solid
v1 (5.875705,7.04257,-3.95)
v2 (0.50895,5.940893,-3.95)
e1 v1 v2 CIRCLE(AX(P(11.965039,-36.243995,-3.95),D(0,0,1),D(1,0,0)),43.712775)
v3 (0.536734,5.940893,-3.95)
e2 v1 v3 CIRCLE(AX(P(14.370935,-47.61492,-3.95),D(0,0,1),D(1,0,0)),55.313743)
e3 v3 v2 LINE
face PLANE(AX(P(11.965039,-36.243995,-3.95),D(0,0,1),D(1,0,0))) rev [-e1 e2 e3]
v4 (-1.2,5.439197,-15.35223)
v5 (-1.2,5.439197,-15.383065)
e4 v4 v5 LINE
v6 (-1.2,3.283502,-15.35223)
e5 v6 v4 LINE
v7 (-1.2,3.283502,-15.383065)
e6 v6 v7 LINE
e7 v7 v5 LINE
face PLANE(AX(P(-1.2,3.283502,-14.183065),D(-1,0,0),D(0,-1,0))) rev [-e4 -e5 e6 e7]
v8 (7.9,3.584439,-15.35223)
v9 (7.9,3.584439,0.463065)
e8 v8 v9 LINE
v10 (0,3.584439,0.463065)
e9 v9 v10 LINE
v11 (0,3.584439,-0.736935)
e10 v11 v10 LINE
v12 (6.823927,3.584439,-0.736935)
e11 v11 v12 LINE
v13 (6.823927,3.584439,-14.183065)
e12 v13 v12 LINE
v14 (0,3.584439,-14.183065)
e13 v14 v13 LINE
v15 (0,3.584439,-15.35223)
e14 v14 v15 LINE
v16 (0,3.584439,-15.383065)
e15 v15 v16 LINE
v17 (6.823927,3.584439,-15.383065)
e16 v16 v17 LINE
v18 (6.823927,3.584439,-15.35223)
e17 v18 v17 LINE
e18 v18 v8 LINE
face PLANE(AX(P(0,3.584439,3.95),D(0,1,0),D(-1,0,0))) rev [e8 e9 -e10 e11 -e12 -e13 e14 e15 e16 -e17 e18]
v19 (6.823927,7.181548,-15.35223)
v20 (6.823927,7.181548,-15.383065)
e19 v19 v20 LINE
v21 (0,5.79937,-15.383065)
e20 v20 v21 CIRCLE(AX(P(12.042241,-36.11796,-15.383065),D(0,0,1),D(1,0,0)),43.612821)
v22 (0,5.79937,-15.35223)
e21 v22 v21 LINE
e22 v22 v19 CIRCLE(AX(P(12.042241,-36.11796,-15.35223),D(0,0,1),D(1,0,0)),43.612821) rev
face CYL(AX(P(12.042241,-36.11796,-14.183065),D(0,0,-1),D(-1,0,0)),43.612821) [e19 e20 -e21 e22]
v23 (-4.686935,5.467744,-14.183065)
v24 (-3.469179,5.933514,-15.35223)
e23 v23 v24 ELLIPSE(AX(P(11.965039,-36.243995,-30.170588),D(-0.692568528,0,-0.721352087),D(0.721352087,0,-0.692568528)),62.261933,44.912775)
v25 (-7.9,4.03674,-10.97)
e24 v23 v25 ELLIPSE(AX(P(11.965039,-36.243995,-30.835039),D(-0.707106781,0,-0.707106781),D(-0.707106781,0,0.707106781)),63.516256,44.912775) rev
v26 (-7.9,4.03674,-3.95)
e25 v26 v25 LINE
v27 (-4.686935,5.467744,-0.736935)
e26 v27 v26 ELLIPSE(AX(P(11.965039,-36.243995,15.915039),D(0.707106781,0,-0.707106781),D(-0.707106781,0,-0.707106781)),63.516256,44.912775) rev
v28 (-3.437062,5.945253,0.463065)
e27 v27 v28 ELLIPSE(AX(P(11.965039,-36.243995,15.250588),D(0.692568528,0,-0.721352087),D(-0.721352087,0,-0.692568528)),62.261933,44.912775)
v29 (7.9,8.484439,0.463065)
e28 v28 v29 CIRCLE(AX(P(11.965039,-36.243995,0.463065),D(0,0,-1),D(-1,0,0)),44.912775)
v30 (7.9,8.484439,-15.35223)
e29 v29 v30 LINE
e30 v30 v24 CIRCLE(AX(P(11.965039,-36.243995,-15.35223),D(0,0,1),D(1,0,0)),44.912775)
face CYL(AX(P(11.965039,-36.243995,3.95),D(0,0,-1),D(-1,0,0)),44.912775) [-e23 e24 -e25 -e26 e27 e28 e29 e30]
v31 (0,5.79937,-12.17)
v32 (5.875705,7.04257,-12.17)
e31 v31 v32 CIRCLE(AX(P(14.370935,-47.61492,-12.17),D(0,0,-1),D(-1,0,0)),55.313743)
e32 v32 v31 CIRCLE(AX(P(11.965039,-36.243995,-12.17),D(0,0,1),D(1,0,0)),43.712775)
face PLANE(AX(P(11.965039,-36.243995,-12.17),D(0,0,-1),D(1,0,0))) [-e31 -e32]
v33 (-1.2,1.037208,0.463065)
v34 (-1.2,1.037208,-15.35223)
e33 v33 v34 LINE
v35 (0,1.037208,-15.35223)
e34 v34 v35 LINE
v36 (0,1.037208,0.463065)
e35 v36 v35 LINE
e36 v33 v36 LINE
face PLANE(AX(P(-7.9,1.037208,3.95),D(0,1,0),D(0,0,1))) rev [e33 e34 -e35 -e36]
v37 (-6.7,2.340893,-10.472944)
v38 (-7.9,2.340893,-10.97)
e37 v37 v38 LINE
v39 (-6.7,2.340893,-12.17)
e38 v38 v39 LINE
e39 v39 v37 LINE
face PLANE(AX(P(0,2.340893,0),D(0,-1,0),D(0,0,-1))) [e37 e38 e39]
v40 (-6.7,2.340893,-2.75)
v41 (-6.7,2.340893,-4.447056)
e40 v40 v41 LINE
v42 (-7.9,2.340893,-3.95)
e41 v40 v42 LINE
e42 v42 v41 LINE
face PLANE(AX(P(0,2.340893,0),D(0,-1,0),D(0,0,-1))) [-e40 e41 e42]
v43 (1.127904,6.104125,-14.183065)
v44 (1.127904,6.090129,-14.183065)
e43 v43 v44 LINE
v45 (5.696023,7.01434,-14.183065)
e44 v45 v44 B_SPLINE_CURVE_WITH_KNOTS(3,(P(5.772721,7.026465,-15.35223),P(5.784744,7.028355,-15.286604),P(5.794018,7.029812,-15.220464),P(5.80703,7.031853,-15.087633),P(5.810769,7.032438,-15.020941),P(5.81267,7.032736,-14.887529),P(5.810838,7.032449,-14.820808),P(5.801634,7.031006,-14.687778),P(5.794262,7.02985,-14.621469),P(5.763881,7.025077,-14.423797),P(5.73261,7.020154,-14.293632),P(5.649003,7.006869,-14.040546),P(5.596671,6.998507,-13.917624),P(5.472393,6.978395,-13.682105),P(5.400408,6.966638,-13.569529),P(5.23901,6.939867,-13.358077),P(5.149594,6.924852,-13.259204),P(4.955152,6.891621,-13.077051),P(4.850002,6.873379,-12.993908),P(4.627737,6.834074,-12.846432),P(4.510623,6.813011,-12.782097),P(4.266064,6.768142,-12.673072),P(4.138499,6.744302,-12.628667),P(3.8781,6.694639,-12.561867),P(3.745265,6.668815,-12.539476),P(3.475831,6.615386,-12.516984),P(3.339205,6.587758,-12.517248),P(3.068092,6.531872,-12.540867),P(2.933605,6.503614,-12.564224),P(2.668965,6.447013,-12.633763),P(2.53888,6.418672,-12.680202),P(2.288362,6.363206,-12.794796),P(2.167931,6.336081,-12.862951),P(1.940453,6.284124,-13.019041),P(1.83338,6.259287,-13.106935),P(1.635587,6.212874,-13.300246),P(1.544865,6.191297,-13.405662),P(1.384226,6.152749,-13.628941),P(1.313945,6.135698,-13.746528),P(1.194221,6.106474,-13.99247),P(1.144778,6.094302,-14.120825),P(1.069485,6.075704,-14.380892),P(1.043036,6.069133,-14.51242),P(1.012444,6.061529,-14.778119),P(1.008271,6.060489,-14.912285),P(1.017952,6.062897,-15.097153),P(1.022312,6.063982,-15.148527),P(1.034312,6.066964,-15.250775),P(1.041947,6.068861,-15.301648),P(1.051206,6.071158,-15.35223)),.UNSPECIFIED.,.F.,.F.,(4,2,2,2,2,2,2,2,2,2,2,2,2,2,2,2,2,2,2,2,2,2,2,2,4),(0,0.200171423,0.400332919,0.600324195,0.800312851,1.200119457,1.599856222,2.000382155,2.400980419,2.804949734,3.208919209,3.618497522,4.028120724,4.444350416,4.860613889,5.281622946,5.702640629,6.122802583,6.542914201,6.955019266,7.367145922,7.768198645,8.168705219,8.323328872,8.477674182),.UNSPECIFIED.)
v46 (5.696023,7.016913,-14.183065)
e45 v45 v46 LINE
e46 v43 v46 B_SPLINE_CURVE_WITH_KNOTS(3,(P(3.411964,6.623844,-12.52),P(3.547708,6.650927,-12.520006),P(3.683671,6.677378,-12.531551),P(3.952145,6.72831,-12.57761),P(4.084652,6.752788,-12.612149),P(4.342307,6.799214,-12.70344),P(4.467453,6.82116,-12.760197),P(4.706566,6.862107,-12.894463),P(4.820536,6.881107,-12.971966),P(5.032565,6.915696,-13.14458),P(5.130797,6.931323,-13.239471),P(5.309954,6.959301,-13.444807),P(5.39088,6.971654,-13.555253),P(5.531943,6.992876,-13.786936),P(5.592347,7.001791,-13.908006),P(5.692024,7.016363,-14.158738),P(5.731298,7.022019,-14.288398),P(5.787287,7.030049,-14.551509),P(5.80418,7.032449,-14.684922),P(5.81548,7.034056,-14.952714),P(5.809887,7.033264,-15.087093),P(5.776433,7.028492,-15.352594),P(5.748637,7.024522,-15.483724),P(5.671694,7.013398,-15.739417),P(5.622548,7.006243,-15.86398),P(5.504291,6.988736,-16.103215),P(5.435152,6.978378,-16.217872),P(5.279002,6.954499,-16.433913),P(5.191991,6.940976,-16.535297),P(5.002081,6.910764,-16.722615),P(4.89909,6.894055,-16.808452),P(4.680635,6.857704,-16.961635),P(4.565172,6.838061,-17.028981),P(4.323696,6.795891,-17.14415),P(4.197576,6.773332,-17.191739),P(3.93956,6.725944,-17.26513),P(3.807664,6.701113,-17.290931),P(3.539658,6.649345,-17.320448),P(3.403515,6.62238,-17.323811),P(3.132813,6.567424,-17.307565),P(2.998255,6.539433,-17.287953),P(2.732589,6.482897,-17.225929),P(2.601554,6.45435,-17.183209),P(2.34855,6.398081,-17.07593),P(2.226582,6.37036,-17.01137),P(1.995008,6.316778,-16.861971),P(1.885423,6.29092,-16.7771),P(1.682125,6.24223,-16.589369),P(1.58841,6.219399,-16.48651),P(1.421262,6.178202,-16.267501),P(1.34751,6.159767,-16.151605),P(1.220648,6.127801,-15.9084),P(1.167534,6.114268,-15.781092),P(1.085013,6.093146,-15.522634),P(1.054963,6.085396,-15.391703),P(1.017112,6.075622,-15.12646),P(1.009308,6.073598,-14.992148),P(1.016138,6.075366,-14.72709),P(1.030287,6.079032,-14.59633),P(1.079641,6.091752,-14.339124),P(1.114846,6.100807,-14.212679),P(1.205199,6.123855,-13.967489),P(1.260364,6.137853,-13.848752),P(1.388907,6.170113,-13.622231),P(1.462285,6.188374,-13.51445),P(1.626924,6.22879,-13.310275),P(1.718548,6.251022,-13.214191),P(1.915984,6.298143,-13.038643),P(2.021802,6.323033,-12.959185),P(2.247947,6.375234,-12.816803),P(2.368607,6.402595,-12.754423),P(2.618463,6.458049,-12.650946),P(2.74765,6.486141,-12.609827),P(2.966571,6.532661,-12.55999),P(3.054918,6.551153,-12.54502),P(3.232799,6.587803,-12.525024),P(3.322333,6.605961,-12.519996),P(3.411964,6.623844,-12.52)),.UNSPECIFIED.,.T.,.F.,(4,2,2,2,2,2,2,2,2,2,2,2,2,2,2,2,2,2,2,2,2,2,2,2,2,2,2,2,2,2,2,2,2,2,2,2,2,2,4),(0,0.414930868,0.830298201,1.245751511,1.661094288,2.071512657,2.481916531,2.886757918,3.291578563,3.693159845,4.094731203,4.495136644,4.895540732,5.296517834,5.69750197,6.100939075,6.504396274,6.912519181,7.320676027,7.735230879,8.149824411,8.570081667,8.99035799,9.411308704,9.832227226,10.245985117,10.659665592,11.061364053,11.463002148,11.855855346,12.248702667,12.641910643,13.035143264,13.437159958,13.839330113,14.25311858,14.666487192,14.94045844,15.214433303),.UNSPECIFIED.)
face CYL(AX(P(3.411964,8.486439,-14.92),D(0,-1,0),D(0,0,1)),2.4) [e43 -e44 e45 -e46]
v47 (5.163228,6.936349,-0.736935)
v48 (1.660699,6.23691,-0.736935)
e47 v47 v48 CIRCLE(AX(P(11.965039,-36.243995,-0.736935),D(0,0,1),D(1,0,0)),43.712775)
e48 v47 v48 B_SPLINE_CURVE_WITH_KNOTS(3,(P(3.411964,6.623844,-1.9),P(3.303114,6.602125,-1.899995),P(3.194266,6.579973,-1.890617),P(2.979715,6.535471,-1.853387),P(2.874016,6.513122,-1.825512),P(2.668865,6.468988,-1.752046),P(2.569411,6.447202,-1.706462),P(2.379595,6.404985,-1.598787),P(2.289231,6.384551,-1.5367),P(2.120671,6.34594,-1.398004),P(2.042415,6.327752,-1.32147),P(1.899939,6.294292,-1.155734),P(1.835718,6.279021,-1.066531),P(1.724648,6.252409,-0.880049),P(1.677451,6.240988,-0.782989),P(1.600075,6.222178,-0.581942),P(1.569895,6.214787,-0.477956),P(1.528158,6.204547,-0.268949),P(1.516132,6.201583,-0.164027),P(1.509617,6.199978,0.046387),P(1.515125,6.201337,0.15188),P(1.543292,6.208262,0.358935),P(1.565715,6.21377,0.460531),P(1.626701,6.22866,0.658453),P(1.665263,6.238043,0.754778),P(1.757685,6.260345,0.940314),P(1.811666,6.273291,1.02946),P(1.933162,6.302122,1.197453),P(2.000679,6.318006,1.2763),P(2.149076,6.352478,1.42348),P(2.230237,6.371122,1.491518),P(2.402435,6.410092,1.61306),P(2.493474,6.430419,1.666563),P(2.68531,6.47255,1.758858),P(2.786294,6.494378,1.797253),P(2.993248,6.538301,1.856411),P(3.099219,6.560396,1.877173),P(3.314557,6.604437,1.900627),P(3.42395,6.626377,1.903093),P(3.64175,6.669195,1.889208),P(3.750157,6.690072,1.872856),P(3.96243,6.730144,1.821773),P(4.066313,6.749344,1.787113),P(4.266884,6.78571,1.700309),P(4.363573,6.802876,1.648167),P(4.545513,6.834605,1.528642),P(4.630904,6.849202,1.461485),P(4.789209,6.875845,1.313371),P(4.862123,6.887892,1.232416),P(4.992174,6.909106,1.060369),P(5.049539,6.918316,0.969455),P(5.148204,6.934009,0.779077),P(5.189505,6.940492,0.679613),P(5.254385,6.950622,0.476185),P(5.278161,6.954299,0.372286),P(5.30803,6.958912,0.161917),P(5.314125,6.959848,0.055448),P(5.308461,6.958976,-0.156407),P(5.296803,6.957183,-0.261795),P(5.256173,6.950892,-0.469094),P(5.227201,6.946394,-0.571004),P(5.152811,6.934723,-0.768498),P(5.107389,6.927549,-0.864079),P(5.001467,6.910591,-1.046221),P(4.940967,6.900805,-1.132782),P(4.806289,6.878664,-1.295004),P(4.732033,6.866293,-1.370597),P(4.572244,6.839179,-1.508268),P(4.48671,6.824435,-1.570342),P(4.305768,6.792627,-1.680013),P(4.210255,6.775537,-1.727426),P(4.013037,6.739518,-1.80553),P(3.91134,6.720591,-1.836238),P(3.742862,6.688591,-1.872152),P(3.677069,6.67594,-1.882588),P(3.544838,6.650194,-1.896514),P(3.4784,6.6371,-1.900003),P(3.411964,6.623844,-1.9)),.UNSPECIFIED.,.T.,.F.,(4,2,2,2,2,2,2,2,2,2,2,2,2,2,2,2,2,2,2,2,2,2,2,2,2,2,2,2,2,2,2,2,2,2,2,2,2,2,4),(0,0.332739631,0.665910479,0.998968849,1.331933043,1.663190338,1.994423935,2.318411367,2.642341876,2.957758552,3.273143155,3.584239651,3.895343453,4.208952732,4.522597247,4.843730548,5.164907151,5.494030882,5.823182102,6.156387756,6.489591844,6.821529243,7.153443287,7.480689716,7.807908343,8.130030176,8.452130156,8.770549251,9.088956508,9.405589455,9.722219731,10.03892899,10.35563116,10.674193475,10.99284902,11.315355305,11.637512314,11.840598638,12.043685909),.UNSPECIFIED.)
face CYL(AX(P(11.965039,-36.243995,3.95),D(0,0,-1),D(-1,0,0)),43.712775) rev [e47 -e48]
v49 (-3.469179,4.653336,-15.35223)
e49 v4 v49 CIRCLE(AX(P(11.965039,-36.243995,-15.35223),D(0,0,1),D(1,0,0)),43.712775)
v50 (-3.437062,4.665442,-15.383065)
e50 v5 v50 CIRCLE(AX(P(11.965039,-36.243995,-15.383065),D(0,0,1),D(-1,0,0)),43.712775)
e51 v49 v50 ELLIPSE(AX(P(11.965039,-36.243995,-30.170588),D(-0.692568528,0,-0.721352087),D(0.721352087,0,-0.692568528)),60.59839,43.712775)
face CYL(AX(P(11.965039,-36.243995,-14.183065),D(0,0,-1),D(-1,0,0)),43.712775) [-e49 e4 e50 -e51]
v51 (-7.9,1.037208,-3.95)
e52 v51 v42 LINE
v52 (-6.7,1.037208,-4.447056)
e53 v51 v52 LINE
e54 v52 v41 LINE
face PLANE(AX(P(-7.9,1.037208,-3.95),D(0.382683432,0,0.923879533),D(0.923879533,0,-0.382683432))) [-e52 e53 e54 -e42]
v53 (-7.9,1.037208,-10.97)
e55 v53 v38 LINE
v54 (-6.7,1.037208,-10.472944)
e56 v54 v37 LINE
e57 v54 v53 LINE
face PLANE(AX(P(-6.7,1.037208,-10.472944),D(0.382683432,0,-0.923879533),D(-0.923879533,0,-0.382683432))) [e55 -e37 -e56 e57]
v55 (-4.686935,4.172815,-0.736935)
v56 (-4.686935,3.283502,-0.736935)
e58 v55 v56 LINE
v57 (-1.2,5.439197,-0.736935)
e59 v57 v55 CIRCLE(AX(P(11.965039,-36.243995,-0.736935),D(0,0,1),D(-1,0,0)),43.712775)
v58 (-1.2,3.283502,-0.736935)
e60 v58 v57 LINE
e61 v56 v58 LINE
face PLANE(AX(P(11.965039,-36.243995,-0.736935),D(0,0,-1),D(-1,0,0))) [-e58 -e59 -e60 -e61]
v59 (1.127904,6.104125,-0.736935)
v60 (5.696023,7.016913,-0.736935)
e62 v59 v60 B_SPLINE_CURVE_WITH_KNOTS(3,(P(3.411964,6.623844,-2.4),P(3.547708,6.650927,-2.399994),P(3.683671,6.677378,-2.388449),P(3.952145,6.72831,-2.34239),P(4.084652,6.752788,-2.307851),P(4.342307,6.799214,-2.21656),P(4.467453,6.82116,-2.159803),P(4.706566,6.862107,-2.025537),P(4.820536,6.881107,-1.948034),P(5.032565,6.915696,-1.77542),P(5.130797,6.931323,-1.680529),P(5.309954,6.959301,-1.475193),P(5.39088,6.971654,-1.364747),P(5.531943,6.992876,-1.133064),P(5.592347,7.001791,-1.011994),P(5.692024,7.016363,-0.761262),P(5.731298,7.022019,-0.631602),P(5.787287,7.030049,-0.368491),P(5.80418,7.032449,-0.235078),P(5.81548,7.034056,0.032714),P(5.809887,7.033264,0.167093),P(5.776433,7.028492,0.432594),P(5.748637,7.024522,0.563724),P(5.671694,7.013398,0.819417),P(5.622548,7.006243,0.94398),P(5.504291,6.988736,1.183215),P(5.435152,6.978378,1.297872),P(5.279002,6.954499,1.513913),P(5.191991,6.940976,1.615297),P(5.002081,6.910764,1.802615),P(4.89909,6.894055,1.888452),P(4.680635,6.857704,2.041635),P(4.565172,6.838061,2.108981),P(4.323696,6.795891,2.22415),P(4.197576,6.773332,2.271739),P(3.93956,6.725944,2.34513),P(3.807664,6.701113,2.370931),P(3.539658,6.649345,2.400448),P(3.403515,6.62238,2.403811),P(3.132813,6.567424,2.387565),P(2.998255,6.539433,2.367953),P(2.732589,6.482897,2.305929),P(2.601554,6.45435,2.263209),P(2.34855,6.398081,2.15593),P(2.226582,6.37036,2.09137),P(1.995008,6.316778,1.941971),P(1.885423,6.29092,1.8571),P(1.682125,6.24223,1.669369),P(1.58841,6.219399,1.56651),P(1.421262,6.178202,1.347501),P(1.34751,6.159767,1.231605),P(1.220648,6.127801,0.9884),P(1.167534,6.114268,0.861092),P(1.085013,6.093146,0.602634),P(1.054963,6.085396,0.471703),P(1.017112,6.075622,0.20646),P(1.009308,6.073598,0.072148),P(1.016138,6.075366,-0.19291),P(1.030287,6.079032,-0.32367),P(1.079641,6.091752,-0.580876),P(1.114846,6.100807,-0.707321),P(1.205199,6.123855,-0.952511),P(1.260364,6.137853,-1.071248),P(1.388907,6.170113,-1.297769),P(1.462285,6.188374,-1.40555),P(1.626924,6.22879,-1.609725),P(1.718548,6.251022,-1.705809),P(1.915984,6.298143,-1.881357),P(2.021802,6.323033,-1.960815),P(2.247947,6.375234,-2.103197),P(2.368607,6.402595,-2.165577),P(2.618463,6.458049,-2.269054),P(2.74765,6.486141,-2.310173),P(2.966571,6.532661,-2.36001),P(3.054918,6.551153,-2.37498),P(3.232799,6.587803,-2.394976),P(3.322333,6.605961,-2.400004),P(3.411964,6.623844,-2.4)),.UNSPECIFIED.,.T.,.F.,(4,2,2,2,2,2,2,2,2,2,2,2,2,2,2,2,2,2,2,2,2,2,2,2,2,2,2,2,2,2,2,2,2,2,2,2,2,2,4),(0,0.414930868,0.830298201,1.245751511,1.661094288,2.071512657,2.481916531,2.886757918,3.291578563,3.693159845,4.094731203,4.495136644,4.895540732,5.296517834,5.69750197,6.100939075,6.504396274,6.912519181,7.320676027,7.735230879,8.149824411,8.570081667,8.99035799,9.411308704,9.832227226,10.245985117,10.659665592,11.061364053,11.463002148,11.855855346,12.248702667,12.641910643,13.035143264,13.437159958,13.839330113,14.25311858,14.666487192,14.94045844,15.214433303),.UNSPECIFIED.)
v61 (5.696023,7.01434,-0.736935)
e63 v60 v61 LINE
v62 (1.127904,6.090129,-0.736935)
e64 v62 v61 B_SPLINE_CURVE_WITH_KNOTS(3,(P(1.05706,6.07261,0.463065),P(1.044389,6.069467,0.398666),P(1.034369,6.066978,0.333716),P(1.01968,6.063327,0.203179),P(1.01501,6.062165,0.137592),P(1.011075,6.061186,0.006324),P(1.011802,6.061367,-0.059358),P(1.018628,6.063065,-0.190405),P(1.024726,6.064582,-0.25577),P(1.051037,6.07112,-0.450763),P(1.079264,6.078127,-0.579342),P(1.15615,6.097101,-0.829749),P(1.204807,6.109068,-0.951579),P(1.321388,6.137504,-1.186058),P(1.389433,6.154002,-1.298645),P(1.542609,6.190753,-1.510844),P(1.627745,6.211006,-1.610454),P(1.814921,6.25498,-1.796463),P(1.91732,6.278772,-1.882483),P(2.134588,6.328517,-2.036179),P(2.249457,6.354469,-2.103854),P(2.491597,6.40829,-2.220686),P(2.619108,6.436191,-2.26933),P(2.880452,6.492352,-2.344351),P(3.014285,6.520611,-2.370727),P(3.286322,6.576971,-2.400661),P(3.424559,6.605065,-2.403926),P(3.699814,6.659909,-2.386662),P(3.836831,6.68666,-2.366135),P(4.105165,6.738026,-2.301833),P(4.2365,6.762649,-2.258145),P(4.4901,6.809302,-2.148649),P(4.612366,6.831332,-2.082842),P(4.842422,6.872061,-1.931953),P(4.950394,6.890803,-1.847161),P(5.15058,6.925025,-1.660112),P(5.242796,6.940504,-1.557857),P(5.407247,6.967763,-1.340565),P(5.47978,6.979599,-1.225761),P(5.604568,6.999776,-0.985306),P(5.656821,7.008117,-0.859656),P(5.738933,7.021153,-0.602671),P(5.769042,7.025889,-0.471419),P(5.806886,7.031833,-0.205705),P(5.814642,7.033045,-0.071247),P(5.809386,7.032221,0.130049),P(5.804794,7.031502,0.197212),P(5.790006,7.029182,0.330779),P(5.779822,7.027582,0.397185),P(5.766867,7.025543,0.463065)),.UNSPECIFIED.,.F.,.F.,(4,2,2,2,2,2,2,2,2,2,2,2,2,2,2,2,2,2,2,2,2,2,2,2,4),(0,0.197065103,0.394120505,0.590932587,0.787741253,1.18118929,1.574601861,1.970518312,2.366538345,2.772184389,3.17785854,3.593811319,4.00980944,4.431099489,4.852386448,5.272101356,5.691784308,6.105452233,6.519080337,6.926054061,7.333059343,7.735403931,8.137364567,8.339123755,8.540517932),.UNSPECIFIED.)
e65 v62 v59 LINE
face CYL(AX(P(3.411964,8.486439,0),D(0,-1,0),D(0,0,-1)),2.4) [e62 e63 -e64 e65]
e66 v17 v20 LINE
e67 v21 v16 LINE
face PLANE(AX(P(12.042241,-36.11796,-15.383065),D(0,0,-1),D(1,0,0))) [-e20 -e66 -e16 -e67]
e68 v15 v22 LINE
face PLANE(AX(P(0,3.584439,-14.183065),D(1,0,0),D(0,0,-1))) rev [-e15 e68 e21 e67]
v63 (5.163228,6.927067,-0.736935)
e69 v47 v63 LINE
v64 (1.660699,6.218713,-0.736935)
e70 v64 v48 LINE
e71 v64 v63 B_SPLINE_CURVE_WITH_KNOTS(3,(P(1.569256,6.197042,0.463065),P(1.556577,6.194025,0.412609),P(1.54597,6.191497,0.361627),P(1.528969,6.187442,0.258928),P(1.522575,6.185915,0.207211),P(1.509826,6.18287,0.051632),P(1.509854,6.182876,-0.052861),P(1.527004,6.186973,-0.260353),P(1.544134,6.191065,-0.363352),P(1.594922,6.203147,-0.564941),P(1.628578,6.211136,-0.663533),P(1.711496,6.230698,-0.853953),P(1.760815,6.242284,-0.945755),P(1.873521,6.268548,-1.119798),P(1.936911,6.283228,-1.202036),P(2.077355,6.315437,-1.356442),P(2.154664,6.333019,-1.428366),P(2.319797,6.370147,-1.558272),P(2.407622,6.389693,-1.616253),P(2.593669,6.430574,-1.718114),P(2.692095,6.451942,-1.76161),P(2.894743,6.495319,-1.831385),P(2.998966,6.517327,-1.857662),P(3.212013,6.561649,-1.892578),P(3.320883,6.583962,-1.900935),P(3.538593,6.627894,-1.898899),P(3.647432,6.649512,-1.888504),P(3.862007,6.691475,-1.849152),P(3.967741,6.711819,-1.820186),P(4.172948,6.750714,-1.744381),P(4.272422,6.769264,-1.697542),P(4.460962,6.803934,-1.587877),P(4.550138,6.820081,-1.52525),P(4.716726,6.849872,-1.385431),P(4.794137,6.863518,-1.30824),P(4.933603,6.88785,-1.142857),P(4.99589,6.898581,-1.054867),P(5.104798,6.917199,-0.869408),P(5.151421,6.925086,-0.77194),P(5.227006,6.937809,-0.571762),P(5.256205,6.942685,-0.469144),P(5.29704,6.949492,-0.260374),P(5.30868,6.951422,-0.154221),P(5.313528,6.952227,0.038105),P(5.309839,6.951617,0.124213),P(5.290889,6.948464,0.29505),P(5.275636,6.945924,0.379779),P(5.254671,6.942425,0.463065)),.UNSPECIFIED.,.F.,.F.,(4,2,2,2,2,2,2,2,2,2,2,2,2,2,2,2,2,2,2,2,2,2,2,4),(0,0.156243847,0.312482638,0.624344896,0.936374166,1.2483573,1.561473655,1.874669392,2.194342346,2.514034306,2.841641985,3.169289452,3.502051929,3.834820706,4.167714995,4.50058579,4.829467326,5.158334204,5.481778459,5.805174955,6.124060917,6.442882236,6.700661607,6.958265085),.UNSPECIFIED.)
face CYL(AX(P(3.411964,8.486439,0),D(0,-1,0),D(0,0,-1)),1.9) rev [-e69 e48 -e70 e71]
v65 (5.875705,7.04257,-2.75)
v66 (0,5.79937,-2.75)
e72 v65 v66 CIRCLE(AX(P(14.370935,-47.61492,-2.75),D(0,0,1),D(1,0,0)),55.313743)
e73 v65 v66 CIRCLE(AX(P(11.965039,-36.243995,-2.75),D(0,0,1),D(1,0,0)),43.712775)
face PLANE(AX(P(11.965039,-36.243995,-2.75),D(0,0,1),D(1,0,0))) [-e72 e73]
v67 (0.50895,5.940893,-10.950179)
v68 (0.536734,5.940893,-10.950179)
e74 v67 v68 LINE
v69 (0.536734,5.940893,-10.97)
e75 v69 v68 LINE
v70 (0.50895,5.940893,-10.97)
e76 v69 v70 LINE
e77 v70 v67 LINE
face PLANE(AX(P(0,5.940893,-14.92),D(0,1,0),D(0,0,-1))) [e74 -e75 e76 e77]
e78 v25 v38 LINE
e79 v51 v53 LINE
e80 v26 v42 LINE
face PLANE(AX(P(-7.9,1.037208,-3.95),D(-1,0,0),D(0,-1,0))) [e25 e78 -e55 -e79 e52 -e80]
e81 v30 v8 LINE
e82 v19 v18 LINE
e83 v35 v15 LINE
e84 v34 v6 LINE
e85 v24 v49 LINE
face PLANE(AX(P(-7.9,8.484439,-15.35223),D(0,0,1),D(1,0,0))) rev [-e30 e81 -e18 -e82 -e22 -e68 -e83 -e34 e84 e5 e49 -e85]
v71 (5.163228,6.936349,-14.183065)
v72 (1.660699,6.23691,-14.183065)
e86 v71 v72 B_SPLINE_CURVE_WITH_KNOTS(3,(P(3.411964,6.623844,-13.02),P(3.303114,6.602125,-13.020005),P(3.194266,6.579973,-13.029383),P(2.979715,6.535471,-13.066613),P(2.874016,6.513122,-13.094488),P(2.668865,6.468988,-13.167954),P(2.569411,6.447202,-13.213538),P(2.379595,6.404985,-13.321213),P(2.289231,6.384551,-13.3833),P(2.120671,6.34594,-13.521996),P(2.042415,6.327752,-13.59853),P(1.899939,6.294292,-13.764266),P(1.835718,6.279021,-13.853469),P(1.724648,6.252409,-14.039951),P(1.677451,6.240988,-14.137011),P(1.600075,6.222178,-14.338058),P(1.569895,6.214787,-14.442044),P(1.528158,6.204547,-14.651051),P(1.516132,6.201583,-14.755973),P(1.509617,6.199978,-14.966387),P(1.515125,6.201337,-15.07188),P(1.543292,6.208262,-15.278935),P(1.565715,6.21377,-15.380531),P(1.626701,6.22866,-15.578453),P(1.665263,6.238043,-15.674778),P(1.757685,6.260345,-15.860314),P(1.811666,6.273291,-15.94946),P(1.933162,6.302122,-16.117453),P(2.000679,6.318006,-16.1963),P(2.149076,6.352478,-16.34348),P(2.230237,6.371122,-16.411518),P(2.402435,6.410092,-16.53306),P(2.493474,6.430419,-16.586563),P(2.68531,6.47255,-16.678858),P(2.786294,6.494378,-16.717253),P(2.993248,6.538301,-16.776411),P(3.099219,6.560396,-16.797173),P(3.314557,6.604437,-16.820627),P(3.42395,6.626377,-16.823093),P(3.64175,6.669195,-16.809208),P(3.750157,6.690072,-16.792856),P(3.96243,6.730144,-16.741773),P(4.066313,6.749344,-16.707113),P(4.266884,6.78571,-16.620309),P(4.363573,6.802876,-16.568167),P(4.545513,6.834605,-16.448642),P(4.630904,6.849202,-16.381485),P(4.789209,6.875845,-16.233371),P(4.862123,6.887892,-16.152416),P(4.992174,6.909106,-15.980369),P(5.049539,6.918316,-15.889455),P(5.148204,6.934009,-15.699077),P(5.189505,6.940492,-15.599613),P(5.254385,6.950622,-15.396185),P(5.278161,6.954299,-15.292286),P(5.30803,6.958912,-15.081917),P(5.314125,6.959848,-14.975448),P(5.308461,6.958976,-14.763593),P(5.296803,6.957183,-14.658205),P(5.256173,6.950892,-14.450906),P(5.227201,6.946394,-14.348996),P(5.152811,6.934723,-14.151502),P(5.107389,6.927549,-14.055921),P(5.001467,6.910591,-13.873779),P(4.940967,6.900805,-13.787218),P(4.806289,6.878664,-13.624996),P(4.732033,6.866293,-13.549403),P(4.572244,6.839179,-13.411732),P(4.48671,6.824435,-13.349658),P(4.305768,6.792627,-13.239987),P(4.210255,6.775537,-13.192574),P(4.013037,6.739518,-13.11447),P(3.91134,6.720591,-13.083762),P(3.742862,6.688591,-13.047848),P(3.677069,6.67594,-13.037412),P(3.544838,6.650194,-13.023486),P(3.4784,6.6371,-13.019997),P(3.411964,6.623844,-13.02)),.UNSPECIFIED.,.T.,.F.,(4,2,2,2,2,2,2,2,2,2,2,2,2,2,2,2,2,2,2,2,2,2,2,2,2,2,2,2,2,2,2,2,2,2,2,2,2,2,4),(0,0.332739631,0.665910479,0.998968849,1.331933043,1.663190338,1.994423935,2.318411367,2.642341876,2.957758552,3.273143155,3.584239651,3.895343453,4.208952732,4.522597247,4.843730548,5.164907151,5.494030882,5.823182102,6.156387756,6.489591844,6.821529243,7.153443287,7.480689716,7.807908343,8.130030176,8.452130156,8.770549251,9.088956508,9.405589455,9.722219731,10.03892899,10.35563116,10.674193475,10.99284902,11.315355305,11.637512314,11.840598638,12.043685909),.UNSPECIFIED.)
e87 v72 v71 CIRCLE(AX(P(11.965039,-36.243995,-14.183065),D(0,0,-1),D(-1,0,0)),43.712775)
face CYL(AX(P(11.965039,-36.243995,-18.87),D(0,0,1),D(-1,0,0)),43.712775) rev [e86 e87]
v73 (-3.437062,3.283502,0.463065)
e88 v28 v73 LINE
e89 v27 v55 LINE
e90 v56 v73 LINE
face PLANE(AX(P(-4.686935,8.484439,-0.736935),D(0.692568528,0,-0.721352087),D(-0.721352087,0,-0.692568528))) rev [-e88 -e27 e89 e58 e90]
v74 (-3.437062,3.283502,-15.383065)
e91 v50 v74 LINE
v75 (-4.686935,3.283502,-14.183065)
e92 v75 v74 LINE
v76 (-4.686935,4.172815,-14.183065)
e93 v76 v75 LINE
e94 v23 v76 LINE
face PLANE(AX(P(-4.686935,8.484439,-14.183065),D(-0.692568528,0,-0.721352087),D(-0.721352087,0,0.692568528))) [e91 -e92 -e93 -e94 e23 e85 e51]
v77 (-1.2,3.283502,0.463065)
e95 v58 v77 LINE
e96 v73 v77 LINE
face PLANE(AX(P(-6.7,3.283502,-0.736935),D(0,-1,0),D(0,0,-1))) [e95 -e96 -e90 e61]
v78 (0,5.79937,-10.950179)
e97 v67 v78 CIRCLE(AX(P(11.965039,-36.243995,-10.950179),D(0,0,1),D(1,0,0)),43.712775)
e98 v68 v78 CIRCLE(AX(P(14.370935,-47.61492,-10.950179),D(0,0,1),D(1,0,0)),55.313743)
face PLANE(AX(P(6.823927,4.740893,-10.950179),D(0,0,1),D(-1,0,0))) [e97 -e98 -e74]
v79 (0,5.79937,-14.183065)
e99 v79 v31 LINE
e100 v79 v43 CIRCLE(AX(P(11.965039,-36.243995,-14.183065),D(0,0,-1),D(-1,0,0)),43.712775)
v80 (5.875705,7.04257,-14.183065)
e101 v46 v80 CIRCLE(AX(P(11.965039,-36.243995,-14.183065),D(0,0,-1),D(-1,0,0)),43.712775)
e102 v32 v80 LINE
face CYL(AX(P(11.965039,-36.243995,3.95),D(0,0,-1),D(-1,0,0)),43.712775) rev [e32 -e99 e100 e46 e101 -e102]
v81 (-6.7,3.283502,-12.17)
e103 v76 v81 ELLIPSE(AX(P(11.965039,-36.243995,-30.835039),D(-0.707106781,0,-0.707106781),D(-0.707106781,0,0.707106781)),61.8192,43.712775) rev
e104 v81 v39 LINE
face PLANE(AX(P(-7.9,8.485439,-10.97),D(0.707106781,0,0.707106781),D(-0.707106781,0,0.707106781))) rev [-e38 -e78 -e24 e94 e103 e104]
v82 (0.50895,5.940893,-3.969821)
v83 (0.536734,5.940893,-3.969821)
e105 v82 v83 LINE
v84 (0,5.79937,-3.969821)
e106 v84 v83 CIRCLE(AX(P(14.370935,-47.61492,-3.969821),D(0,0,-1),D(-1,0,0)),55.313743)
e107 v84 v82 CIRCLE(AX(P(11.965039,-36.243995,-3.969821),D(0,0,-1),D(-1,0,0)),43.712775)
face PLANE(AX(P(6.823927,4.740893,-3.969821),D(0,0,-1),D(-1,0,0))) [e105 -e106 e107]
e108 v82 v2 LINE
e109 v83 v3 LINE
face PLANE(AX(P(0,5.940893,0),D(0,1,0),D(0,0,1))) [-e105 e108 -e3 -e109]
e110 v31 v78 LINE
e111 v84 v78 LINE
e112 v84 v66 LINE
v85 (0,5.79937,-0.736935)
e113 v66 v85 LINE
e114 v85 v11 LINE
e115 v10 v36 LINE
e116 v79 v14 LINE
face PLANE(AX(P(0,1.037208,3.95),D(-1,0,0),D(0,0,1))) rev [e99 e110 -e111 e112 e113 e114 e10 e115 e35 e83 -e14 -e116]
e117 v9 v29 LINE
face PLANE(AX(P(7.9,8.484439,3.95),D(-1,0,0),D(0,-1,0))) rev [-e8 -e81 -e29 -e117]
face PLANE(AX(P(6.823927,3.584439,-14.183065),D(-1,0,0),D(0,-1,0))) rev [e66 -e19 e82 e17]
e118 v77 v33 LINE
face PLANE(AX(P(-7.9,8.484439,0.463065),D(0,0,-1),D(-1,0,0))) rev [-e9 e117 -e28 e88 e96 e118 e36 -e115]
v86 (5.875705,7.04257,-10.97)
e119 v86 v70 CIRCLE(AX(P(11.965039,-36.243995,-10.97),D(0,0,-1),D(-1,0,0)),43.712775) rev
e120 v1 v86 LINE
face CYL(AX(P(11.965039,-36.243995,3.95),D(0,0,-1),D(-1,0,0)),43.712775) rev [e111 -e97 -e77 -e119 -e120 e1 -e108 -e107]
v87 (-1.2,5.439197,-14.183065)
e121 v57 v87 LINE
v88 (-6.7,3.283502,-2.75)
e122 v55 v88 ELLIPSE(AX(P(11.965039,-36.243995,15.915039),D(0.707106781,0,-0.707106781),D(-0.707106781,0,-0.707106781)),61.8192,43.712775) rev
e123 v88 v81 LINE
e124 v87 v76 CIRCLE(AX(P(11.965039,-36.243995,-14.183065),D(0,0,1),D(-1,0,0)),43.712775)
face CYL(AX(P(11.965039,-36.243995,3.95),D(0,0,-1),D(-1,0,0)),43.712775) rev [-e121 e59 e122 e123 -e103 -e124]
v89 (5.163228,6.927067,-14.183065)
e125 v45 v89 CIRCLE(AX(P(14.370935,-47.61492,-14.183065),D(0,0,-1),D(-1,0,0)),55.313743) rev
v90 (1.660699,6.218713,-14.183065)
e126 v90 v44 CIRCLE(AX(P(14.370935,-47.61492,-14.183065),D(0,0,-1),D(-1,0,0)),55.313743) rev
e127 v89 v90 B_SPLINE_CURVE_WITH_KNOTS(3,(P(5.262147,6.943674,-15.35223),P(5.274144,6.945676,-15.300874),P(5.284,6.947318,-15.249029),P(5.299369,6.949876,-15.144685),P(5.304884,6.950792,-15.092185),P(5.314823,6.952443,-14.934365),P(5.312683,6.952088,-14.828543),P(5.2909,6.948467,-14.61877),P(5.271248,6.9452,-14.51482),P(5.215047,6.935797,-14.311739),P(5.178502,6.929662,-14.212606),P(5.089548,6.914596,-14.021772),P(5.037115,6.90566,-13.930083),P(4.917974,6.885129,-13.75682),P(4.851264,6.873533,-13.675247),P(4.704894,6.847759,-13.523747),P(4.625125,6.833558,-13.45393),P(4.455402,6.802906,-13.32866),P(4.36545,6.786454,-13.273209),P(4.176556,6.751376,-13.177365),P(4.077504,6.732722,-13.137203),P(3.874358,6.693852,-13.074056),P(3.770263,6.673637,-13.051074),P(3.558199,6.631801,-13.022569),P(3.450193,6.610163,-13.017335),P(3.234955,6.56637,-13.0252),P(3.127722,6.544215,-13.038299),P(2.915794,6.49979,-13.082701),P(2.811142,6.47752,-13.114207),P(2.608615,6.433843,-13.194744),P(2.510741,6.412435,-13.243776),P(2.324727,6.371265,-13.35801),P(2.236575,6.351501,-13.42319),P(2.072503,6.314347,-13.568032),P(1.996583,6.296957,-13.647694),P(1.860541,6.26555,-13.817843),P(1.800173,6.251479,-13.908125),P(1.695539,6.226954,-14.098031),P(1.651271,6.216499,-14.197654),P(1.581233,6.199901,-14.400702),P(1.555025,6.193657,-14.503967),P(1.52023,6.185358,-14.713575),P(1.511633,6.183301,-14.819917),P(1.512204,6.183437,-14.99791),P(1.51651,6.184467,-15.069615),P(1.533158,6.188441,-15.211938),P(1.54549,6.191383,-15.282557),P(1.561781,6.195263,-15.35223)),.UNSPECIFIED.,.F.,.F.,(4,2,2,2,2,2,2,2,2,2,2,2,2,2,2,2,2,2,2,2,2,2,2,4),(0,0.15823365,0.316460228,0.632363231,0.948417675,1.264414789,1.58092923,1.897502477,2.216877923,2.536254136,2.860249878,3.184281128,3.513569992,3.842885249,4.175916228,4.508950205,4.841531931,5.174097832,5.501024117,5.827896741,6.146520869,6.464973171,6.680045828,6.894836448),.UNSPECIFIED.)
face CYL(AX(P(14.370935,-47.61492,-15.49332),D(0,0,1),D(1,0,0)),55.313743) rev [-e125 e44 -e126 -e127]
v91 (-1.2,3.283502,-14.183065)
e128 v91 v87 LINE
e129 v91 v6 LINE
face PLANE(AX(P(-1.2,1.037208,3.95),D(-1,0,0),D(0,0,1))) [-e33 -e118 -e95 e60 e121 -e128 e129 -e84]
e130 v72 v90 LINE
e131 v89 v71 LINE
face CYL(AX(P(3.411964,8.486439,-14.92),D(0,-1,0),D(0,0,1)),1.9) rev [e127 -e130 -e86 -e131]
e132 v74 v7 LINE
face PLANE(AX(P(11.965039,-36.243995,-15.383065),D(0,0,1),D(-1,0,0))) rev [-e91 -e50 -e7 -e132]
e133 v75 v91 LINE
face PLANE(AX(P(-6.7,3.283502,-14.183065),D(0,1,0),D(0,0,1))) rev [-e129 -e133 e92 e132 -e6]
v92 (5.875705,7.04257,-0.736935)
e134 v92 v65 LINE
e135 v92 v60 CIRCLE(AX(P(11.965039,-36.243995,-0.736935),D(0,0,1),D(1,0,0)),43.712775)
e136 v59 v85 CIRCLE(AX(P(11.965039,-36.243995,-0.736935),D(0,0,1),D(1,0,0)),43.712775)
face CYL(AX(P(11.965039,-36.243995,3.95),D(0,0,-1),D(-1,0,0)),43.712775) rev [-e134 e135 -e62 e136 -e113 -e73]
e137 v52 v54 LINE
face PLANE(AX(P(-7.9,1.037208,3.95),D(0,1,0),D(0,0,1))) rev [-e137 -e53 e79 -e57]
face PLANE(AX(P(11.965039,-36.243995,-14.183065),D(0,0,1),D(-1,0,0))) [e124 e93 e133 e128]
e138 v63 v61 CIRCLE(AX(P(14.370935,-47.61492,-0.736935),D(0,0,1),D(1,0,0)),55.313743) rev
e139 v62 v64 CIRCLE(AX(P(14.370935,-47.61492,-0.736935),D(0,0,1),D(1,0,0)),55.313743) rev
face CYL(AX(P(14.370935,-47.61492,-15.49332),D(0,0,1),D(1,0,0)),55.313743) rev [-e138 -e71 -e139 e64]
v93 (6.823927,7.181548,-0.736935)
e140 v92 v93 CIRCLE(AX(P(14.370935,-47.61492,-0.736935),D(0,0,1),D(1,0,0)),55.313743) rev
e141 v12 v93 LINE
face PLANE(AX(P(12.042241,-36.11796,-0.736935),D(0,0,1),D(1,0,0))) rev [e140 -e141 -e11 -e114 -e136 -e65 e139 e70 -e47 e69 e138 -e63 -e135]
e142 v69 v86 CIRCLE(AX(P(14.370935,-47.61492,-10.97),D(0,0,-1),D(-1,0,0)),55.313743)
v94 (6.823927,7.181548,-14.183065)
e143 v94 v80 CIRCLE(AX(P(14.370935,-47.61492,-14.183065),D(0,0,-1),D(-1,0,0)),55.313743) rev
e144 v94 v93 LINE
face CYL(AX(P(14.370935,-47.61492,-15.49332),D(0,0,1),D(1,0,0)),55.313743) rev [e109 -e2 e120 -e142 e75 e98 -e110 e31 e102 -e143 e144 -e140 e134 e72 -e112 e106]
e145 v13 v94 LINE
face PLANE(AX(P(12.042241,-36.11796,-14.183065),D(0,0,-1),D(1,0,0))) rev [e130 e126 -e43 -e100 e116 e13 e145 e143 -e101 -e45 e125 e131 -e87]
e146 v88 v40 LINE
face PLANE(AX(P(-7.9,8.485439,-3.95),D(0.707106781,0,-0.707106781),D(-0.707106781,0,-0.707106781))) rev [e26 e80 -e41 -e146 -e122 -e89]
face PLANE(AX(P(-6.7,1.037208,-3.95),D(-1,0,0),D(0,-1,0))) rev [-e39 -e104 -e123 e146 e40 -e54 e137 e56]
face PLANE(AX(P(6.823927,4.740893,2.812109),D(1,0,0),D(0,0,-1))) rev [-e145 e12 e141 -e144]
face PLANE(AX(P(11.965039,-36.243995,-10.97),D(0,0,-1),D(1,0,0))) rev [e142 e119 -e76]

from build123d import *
from build123d.topology import SkipClean

# Parameters (mm, degrees)
BOSS_EXTRUDE1_DEPTH      = 3.95
SHELL1_T                 = -1.2
SKETCH3_W                = 6.823927471
SKETCH3_H                = 5.581929969
CUT_EXTRUDE1_DEPTH       = 2.4
BOSS_EXTRUDE3_REACH      = 14.559
BOSS_EXTRUDE3_END_RADIUS = 43.712775366
BOSS_EXTRUDE3_START      = -1.8
SKETCH4_R                = 2.4
SKETCH4_R_2              = 1.9
CUT_EXTRUDE4_REACH       = 13.553
BOSS_EXTRUDE4_START      = -3.51
BOSS_EXTRUDE4_DEPTH      = 3.51
SHELL2_START             = 3.540892579
SHELL2_OUTLINE_W         = 7.9
SHELL2_OUTLINE_H         = 6.98035738
SHELL2_DEPTH             = 3.609652258
SHELL2_START_2           = 1.037208095
SHELL2_2_DEPTH           = 4.401988613
SHELL2_START_3           = -10.97
SHELL2_3_DEPTH           = 7.02
SHELL2_4_DEPTH           = 7.02
CUT_EXTRUDE5_DEPTH       = 22.359542769
SKETCH16_W               = 22.82
SKETCH16_H               = 1.2435468
CUT_EXTRUDE10_DEPTH      = 7.9
SKETCH17_W               = 3.486934667
SKETCH17_H               = 7.447231284
SKETCH17_W_2             = 3.517769968
CUT_EXTRUDE11_DEPTH      = 27.03272194
CUT_EXTRUDE12_DEPTH      = 18.123431779
CUT_EXTRUDE13_DEPTH      = 20.609163221
BOSS_EXTRUDE5_DEPTH      = 1.2
SKETCH23_W               = 3.213065333
SKETCH23_H               = 2.258477707
SKETCH23_W_2             = 3.182230032
BOSS_EXTRUDE6_DEPTH      = 1.2
BOSS_EXTRUDE7_START      = -1.2
BOSS_EXTRUDE7_DEPTH      = 1.2
CUT_EXTRUDE14_DEPTH      = 19.031936029


with BuildPart() as part:
    # Sketch1 → Boss-Extrude1 (new, symmetric)
    with BuildSketch(Plane.XY):
        with BuildLine():
            Line((7.9, 8.484439379), (7.9, 5.540892579))
            Line((7.9, 5.540892579), (7.9, 2.340892579))
            Line((7.9, 2.340892579), (0, 2.340892579))
            Line((0, 2.340892579), (0, 1.037208095))
            Line((0, 1.037208095), (-7.9, 1.037208095))
            Line((-7.9, 1.037208095), (-7.9, 4.036739959))
            ThreePointArc((-7.9, 4.036739959), (-0.204910293, 6.988512651), (7.9, 8.484439379))
        make_face()
    extrude(amount=BOSS_EXTRUDE1_DEPTH, both=True)

    # Shell1
    shell1_openings = [part.faces().sort_by_distance(p)[0] for p in [
        (-3.95, 1.037208095, 0),
    ]]
    offset(amount=SHELL1_T, openings=shell1_openings, kind=Kind.INTERSECTION)

    # Sketch3 → Cut-Extrude1 (cut)
    with BuildSketch(Plane.XZ.offset(-2.340892579)):
        with Locations((3.411963736, 0.021143674)):
            Rectangle(SKETCH3_W, SKETCH3_H)
    extrude(amount=-CUT_EXTRUDE1_DEPTH, mode=Mode.SUBTRACT)

    # Boss-Extrude3: up to this cylinder (the profile starts inside it)
    boss_extrude3_end = Plane(origin=(11.965039047, -36.243995073, 2.332118), z_dir=(0, 0, -1)) * Cylinder(BOSS_EXTRUDE3_END_RADIUS, 117.543550731, mode=Mode.PRIVATE)
    # Sketch4 → Boss-Extrude3 (add, up to the surface)
    with BuildSketch(Plane(origin=(0, 2.340892579, 0), x_dir=(-1, 0, 0), z_dir=(0, -1, 0)).offset(BOSS_EXTRUDE3_START), mode=Mode.PRIVATE) as boss_extrude3_sk1:
        with Locations(Location((-3.411963735, 0, 0), (0, 0, 90))):
            Circle(SKETCH4_R)
        with Locations(Location((-3.411963735, 0, 0), (0, 0, 90))):
            Circle(SKETCH4_R_2, mode=Mode.SUBTRACT)
    boss_extrude3_tool1 = extrude(boss_extrude3_sk1.sketch, amount=-BOSS_EXTRUDE3_REACH, mode=Mode.PRIVATE) & boss_extrude3_end
    add(boss_extrude3_tool1.solids().sort_by_distance((3.411964, 4.140893, 2.332118))[0])

    # Sketch7 → Cut-Extrude4 (cut, up to next)
    with BuildSketch(Plane(origin=(0, 1.037208095, 0), x_dir=(-1, 0, 0), z_dir=(0, -1, 0)), mode=Mode.PRIVATE) as cut_extrude4_sk1:
        Polygon((7.9, 3.95), (0, -3.95), (7.9, -3.95), align=None)
    cut_extrude4_tool1 = extrude(cut_extrude4_sk1.sketch, amount=-CUT_EXTRUDE4_REACH, mode=Mode.PRIVATE) & part.part
    add(cut_extrude4_tool1.solids().sort_by_distance((-5.266667, 1.037208, 1.316667))[0], mode=Mode.SUBTRACT)

    # Sketch8 → Boss-Extrude4 (add)
    with BuildSketch(Plane(origin=(0, 0, -7.46), x_dir=(-1, 0, 0), z_dir=(0, 0, -1)).offset(BOSS_EXTRUDE4_START)):
        with BuildLine():
            Line((-7.9, 7.189017048), (-7.9, 2.340892579))
            Line((-7.9, 2.340892579), (0, 2.340892579))
            Line((0, 2.340892579), (0, 1.037208095))
            Line((0, 1.037208095), (7.9, 1.037208095))
            Line((7.9, 1.037208095), (7.9, 4.036739959))
            ThreePointArc((7.9, 4.036739959), (0.204910293, 6.988512651), (-7.9, 8.484439379))
            Line((-7.9, 8.484439379), (-7.9, 7.189017048))
        make_face()
    extrude(amount=BOSS_EXTRUDE4_DEPTH)

    # Mirror1: part across plane


with BuildPart() as part_1:
    add(part.part)
    add(part.part.mirror(Plane(origin=(0, 0, -7.46), x_dir=(1, 0, 0), z_dir=(0, 0, -1))))

    # Shell2: read off the stored shape, not the designer's step
    # Shell2 outline → Shell2 (cut)
    with BuildSketch(Plane(origin=(0, 0, 0), x_dir=(1, 0, 0), z_dir=(0, 1, 0)).offset(SHELL2_START)):
        with Locations((2.75, 7.46)):
            Rectangle(SHELL2_OUTLINE_W, SHELL2_OUTLINE_H)
    extrude(amount=SHELL2_DEPTH, mode=Mode.SUBTRACT)

    # Shell2 2 outline → Shell2 2 (cut)
    with BuildSketch(Plane(origin=(0, 0, 0), x_dir=(1, 0, 0), z_dir=(0, 1, 0)).offset(SHELL2_START_2)):
        Polygon((-1.2, 3.95), (-1.2, 10.97), (-6.202943725, 10.97), (-6.7, 10.472943725), (-6.7, 4.447056275), (-6.202943725, 3.95), align=None)
    extrude(amount=SHELL2_2_DEPTH, mode=Mode.SUBTRACT)

    # Shell2 3 outline → Shell2 3 (cut)
    with BuildSketch(Plane.XY.offset(SHELL2_START_3)):
        with BuildLine():
            ThreePointArc((6.7, 7.150544837), (3.582625992, 6.65754198), (0.508949666, 5.940892579))
            Line((0.508949666, 5.940892579), (6.7, 5.940892579))
            Line((6.7, 5.940892579), (6.7, 7.150544837))
        make_face()
    extrude(amount=SHELL2_3_DEPTH, mode=Mode.SUBTRACT)

    # Shell2 4 outline → Shell2 4 (add)
    with SkipClean():  # the faces are left unmerged after this step: merging them gives an invalid solid
        with BuildSketch(Plane.XY.offset(SHELL2_START_3)):
            with BuildLine():
                ThreePointArc((-4.75826547, 5.439196708), (-5.7340289, 5.034333198), (-6.7, 4.606631708))
                Line((-6.7, 4.606631708), (-6.7, 3.283502287))
                ThreePointArc((-6.7, 3.283502287), (-3.986456885, 4.454364939), (-1.2, 5.439196708))
                Line((-1.2, 5.439196708), (-4.75826547, 5.439196708))
            make_face()
            with BuildLine():
                ThreePointArc((0.386122992, 7.150544837), (-0.40902625, 6.930533287), (-1.2, 6.69595297))
                Line((-1.2, 6.69595297), (-1.2, 5.439196708))
                ThreePointArc((-1.2, 5.439196708), (2.710357921, 6.477868269), (6.7, 7.150544837))
                Line((6.7, 7.150544837), (0.386122992, 7.150544837))
            make_face()
        extrude(amount=SHELL2_4_DEPTH)
    add(part_1.part.scale(1), mode=Mode.REPLACE)  # the faces are merged on a copy

    # Sketch10 → Cut-Extrude5 (cut, through all)
    with BuildSketch(Plane(origin=(0, 2.340892579, 0), x_dir=(-1, 0, 0), z_dir=(0, -1, 0))):
        Polygon((1.2, 12.17), (1.2, 10.97), (6.202943725, 10.97), (6.7, 10.472943725), (7.9, 10.97), (6.7, 12.17), align=None)
        Polygon((1.2, 2.75), (6.7, 2.75), (7.9, 3.95), (6.7, 4.447056275), (6.202943725, 3.95), (1.2, 3.95), align=None)
    extrude(amount=CUT_EXTRUDE5_DEPTH, mode=Mode.SUBTRACT)

    # Sketch16 → Cut-Extrude10 (cut)
    with BuildSketch(Plane(origin=(7.9, 0, 0), x_dir=(0, 0, -1), z_dir=(1, 0, 0))):
        with Locations((7.46, 2.962665979)):
            Rectangle(SKETCH16_W, SKETCH16_H)
    extrude(amount=-CUT_EXTRUDE10_DEPTH, mode=Mode.SUBTRACT)

    # Sketch17 → Cut-Extrude11 (cut, through all)
    with BuildSketch(Plane(origin=(7.9, 0, 0), x_dir=(0, 0, -1), z_dir=(1.0, -1.5823538232397524e-12, 0))):
        with Locations((-2.206532667, 4.760823737)):
            Rectangle(SKETCH17_W, SKETCH17_H)
        with Locations((17.111115016, 4.760823737)):
            Rectangle(SKETCH17_W_2, SKETCH17_H)
    extrude(amount=-CUT_EXTRUDE11_DEPTH, mode=Mode.SUBTRACT)

    # Sketch18 → Cut-Extrude12 (cut, through all)
    with BuildSketch(Plane.XY.offset(-2.75)):
        with BuildLine():
            Line((-1.2, 2.340892579), (-6.7, 2.340892579))
            Line((-6.7, 2.340892579), (-6.7, 3.283502287))
            ThreePointArc((-6.7, 3.283502287), (-3.986456885, 4.454364939), (-1.2, 5.439196708))
            Line((-1.2, 5.439196708), (-1.2, 3.540892579))
            Line((-1.2, 3.540892579), (-1.2, 2.340892579))
        make_face()
    extrude(amount=-CUT_EXTRUDE12_DEPTH, mode=Mode.SUBTRACT)

    # Sketch19 → Cut-Extrude13 (cut, through all)
    with BuildSketch(Plane.XY.offset(0.463065333)):
        with BuildLine():
            Line((0, 5.799370286), (0, 3.540892579))
            Line((0, 3.540892579), (6.823927471, 3.584439379))
            Line((6.823927471, 3.584439379), (6.823927471, 7.181547539))
            ThreePointArc((6.823927471, 7.181547539), (3.39019483, 6.597933861), (0, 5.799370286))
        make_face()
    extrude(amount=-CUT_EXTRUDE13_DEPTH, mode=Mode.SUBTRACT)

    # Sketch20 → Boss-Extrude5 (add)
    with BuildSketch(Plane(origin=(0, 0, 0), x_dir=(0, 0, -1), z_dir=(1, 0, 0))):
        Polygon((3.96982131, 3.540892579), (3.953429775, 6.436658409), (10.966345521, 6.396961672), (10.95017869, 3.540892579), align=None)
    extrude(amount=-BOSS_EXTRUDE5_DEPTH)

    # Sketch23 → Boss-Extrude6 (add)
    with BuildSketch(Plane(origin=(0, 0, 0), x_dir=(0, 0, -1), z_dir=(1, 0, 0))):
        with Locations((1.143467334, 4.670131432)):
            Rectangle(SKETCH23_W, SKETCH23_H)
        with Locations((13.761115016, 4.670131432)):
            Rectangle(SKETCH23_W_2, SKETCH23_H)
    extrude(amount=-BOSS_EXTRUDE6_DEPTH)

    # Sketch25 → Boss-Extrude7 (add)
    with BuildSketch(Plane.XY.offset(0.463065333).offset(BOSS_EXTRUDE7_START)):
        with BuildLine():
            Line((6.823927471, 3.584439379), (6.823927471, 7.181547539))
            ThreePointArc((6.823927471, 7.181547539), (3.384337724, 6.626850897), (0, 5.799370286))
            Line((0, 5.799370286), (0, 3.584439379))
            Line((0, 3.584439379), (6.823927471, 3.584439379))
        make_face()
        with BuildLine():
            Line((-6.7, 3.283502287), (-1.2, 3.283502287))
            Line((-1.2, 3.283502287), (-1.2, 5.439196708))
            ThreePointArc((-1.2, 5.439196708), (-3.986456885, 4.454364939), (-6.7, 3.283502287))
        make_face()
    boss_extrude7 = extrude(amount=BOSS_EXTRUDE7_DEPTH)

    # Sketch28 → Cut-Extrude14 (cut, through all)
    with BuildSketch(Plane.XZ.offset(-3.283502287)):
        Polygon((-4.686934667, -0.736934667), (-3.437061956, 0.463065333), (-6.7, 0.463065333), (-6.7, -0.736934667), align=None)
    cut_extrude14 = extrude(amount=-CUT_EXTRUDE14_DEPTH, mode=Mode.SUBTRACT)

    # Mirror2: Boss-Extrude7, Cut-Extrude14 across plane
    add(boss_extrude7.mirror(Plane(origin=(0, 0, -7.46), x_dir=(1, 0, 0), z_dir=(0, 0, -1))))
    add(cut_extrude14.mirror(Plane(origin=(0, 0, -7.46), x_dir=(1, 0, 0), z_dir=(0, 0, -1))), mode=Mode.SUBTRACT)


solid = part_1.part
